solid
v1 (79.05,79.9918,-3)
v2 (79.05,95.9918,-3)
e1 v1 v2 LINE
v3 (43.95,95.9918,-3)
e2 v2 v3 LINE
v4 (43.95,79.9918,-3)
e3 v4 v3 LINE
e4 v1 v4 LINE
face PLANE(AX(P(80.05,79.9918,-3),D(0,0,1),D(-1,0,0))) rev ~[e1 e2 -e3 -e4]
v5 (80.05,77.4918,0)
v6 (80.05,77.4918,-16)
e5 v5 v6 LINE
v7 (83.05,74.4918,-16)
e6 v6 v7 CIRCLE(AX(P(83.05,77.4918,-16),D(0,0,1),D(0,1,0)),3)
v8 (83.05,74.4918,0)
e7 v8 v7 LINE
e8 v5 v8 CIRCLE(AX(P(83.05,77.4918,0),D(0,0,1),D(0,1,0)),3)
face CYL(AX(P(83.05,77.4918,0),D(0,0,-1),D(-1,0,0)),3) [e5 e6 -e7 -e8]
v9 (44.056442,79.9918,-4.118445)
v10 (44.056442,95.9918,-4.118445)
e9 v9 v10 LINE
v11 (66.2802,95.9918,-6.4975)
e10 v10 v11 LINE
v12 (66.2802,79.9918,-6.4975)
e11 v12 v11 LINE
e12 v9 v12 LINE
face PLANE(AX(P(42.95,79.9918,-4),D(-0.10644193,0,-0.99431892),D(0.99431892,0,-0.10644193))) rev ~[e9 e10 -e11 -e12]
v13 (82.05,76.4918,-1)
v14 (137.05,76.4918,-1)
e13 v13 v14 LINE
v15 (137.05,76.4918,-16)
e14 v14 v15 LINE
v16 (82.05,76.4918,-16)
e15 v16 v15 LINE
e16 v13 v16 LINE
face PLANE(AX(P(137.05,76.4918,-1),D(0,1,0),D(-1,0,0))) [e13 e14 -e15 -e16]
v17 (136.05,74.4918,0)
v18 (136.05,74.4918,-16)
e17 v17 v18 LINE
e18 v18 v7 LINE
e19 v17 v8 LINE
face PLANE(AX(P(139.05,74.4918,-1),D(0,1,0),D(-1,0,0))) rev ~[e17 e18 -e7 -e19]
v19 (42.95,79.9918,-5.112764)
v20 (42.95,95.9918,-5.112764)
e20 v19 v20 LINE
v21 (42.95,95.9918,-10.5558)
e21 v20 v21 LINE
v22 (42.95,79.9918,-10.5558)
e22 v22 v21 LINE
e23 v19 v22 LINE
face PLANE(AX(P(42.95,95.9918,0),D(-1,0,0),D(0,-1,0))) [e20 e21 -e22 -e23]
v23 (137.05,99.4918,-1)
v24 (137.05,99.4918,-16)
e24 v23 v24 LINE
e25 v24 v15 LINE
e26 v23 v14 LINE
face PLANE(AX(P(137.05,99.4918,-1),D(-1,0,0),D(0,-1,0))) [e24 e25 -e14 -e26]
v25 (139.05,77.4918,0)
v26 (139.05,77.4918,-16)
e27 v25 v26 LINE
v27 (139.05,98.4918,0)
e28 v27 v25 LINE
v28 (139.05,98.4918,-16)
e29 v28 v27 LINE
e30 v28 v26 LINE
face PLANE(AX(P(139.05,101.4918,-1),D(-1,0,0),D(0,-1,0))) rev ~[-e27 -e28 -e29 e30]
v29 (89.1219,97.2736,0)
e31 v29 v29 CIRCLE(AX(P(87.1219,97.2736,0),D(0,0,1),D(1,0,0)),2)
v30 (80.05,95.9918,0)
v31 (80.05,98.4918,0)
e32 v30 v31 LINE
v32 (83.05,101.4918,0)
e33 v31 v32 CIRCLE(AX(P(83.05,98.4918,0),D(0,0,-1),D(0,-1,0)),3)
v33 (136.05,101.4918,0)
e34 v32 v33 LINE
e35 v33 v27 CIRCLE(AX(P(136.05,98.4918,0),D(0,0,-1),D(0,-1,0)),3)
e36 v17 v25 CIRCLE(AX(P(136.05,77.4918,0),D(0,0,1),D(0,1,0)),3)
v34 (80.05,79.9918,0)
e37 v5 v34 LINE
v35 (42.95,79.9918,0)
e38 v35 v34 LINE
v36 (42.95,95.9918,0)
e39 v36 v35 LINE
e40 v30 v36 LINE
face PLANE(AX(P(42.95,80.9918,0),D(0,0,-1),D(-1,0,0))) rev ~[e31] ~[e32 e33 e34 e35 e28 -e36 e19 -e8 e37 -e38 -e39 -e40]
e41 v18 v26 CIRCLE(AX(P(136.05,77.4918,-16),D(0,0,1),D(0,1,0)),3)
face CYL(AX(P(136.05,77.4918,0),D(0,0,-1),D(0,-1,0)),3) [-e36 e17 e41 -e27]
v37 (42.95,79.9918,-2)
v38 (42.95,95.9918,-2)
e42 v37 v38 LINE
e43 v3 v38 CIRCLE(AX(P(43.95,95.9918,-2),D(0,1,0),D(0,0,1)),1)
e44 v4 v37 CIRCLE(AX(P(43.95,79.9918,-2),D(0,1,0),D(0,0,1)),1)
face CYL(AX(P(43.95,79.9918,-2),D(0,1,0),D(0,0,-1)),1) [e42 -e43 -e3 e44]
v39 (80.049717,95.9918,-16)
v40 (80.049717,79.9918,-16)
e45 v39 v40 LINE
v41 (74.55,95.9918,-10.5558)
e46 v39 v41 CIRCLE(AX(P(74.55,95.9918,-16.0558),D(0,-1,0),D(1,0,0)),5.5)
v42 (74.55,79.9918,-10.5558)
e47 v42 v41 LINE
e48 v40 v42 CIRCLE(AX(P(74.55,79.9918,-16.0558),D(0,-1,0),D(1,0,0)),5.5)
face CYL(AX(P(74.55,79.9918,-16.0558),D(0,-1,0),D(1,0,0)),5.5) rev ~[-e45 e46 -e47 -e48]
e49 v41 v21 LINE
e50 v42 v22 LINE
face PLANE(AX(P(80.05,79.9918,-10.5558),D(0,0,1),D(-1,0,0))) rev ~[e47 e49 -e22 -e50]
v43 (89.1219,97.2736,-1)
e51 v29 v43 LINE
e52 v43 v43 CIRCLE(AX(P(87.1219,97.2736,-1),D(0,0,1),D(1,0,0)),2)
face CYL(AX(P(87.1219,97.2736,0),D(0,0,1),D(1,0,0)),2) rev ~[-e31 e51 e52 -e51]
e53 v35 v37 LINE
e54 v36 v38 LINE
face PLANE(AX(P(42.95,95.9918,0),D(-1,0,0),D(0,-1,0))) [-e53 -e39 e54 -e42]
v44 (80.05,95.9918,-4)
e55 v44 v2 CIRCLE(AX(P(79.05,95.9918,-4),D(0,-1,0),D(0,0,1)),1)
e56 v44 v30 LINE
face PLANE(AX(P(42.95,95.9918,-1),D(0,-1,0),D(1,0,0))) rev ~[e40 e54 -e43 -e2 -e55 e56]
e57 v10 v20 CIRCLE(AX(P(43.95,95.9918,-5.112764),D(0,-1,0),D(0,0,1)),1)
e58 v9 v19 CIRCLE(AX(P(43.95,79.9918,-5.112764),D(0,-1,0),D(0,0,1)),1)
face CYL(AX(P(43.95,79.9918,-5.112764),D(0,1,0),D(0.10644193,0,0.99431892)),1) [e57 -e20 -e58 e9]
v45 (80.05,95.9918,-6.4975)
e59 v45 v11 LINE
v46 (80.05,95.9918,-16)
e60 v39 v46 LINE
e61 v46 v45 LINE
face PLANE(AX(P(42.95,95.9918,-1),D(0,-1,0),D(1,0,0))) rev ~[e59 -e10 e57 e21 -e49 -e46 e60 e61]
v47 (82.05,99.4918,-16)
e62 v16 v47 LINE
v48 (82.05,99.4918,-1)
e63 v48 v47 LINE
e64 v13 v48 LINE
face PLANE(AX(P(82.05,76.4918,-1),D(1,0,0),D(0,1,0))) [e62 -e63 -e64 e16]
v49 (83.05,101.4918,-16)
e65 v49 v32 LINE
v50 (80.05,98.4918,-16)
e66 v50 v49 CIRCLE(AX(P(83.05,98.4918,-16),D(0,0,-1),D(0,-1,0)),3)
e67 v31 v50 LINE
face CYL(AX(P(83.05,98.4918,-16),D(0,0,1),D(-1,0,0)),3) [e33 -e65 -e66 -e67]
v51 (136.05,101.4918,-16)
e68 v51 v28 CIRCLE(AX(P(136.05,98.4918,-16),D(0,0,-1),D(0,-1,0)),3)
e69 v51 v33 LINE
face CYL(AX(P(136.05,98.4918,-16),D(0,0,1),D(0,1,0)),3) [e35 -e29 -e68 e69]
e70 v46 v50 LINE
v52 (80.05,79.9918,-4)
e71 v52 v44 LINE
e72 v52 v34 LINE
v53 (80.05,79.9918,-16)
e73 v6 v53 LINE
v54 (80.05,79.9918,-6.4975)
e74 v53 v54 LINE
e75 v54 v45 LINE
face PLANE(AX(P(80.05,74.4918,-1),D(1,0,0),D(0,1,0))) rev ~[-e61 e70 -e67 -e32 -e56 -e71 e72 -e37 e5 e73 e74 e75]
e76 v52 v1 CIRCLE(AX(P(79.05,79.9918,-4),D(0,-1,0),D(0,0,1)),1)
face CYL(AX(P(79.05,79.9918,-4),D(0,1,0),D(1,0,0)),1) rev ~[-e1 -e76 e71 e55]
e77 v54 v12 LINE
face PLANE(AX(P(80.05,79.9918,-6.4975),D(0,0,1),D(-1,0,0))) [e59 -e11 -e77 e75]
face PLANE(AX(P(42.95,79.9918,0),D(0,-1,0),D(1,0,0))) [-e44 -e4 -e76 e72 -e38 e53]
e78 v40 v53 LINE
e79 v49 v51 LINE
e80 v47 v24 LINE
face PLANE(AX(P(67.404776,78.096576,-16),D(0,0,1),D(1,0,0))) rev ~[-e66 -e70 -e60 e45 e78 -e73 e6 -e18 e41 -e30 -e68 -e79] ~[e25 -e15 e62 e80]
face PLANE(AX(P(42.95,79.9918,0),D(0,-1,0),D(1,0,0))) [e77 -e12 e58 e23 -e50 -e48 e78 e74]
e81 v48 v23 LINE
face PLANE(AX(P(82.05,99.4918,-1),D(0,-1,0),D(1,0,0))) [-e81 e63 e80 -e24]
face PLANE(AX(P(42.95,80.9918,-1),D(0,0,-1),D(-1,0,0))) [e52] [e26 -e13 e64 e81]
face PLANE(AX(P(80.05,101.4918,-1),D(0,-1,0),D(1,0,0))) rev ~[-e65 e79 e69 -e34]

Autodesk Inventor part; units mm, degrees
ref_plane "YZ Plane" through (0, 0, 0) normal (1, 0, 0) x (0, 1, 0)
ref_plane "XZ Plane" through (0, 0, 0) normal (0, 1, 0) x (-1, 0, 0)
ref_plane "XY Plane" through (0, 0, 0) normal (0, 0, 1) x (1, 0, 0)
sketch "草图1" plane through (42.95, 80.9918, 0) normal (0, 0, -1) x (-1, 0, 0)
  line L0 (-94.1, 15) -> (0, 15)
  line L1 (0, 15) -> (0, -1)
  line L2 (0, -1) -> (-94.1, -1)
  line L3 (-94.1, -1) -> (-94.1, 15)
  line L4 (0, 0) -> (0, 14) projected
  line L5 (-94.1, 14) -> (-94.1, 0) projected
  line L6 (0, 14) -> (-94.1, 14) projected
  line L7 (-94.1, 0) -> (0, 0) projected
  line L8 (-94.1, 7) -> (0, 7)
  line L9 (-39.1, -4.5) -> (-94.1, -4.5)
  line L10 (-94.1, -4.5) -> (-94.1, 18.5)
  line L11 (-94.1, 18.5) -> (-39.1, 18.5)
  line L12 (-39.1, 18.5) -> (-39.1, -4.5)
  line L13 (-39.1, -4.5) -> (-94.1, 18.5) construction
  line L14 (-94.1, -4.5) -> (-39.1, 18.5) construction
  point P0 (42.95, -80.9918)
  point P1 (-66.6, 7)
  point P2 (-39.1, -1)
  point P3 (-39.1, 15)
  dimension "d0" = 1
  dimension "d1" = 1
  dimension "d2" = 23
  dimension "d3" = 55
extrude "拉伸1" add sketch "草图1" along normal blind 1
sketch "草图2" plane through (42.95, 80.9918, -1) normal (0, 0, -1) x (-1, 0, 0)
  line L0 (-74.55, 0) -> (-74.55, -4.5) projected
  line L1 (-39.1, 18.5) -> (-94.1, 18.5) projected
  line L2 (-94.1, -4.5) -> (-39.1, -4.5)
  line L3 (-39.1, -4.5) -> (-39.1, 18.5)
  line L4 (-39.1, 18.5) -> (-94.1, 18.5)
  line L5 (-94.1, 18.5) -> (-94.1, -4.5)
  line L6 (-96.1, -6.5) -> (-37.1, -6.5)
  line L7 (-37.1, -6.5) -> (-37.1, 20.5)
  line L8 (-37.1, 20.5) -> (-96.1, 20.5)
  line L9 (-96.1, 20.5) -> (-96.1, -6.5)
  point P0 (42.95, -80.9918)
  dimension "d6" = 2
extrude "拉伸2" add sketch "草图2" against normal up to surface (1 mm away) contours L3 L2 L5 L1 | L9 L8 L7 L6
extrude "拉伸3" add sketch "草图2" along normal blind 15
fillet "圆角1" radius 2 1 edges at (80.05, 87.9918, -1)
sketch "草图3" plane through (42.95, 80.9918, 0) normal (0, 0, 1) x (1, 0, 0)
  point P0 (-42.95, -80.9918)
fillet "圆角2" radius 3 4 edges at (80.05, 74.4918, -8) (80.05, 101.4918, -8) (139.05, 74.4918, -8) (139.05, 101.4918, -8)
sketch "草图4" plane through (42.95, 79.9918, -1) normal (0, -1, 0) x (1, 0, 0)
  line L0 (0, 1) -> (0, 0) projected
  line L1 (37.1, 1) -> (37.1, -15) projected
  line L2 (0, 0) -> (37.1, 0)
  line L3 (37.1, 0) -> (37.1, -9.5558)
  line L4 (37.1, -9.5558) -> (0, -9.5558)
  line L5 (0, -9.5558) -> (0, 0)
  point P0 (-42.95, 1)
  point P1 (37.1, 0)
extrude "拉伸4" add sketch "草图4" against normal up to surface (16 mm away)
fillet "圆角3" radius 5.5 1 edges at (80.05, 87.9918, -10.5558)
sketch "草图5" plane through (42.95, 79.9918, 0) normal (0, -1, 0) x (1, 0, 0)
  line L0 (0, 0) -> (37.1, 0) projected
  line L1 (0, 0) -> (37.1, 0)
  line L2 (37.1, 0) -> (37.1, -3)
  line L3 (37.1, -3) -> (0, -3)
  line L4 (0, -3) -> (0, 0)
  line L5 (37.1, 0) -> (37.1, -16)
  line L6 (0, -3) -> (37.2428, -3)
  line L7 (37.2428, -3) -> (37.2428, -6.4975)
  line L8 (37.2428, -6.4975) -> (0, -6.4975)
  line L9 (0, -6.4975) -> (0, -3)
  line L10 (0, 0) -> (0, -10.5558) projected
  line L11 (0, -4) -> (23.3302, -6.4975)
  point P0 (-42.95, 0)
  point P1 (0, -4)
  point P2 (37.1, -7.9715)
  point P3 (37.1, -3)
  point P4 (37.1, -6.4975)
  dimension "d16" = 3
  dimension "d20" = 1
extrude "拉伸5" cut sketch "草图5" against normal blind 61.75 contours L3 L5 L8 L11 L9
fillet "圆角4" radius 1 3 edges at (80.05, 87.9918, -3) (42.95, 87.9918, -4) (42.95, 87.9918, -3)
sketch "草图6" plane through (42.95, 80.9918, 0) normal (0, 0, 1) x (1, 0, 0)
  circle A0 centre (44.1719, 16.2818) radius 2
  point P0 (-42.95, -80.9918)
  dimension "d22" = 4
extrude "拉伸6" cut sketch "草图6" against normal blind 61.75
properties part number "obj_1_电池盒.STEP_3D 打印"
